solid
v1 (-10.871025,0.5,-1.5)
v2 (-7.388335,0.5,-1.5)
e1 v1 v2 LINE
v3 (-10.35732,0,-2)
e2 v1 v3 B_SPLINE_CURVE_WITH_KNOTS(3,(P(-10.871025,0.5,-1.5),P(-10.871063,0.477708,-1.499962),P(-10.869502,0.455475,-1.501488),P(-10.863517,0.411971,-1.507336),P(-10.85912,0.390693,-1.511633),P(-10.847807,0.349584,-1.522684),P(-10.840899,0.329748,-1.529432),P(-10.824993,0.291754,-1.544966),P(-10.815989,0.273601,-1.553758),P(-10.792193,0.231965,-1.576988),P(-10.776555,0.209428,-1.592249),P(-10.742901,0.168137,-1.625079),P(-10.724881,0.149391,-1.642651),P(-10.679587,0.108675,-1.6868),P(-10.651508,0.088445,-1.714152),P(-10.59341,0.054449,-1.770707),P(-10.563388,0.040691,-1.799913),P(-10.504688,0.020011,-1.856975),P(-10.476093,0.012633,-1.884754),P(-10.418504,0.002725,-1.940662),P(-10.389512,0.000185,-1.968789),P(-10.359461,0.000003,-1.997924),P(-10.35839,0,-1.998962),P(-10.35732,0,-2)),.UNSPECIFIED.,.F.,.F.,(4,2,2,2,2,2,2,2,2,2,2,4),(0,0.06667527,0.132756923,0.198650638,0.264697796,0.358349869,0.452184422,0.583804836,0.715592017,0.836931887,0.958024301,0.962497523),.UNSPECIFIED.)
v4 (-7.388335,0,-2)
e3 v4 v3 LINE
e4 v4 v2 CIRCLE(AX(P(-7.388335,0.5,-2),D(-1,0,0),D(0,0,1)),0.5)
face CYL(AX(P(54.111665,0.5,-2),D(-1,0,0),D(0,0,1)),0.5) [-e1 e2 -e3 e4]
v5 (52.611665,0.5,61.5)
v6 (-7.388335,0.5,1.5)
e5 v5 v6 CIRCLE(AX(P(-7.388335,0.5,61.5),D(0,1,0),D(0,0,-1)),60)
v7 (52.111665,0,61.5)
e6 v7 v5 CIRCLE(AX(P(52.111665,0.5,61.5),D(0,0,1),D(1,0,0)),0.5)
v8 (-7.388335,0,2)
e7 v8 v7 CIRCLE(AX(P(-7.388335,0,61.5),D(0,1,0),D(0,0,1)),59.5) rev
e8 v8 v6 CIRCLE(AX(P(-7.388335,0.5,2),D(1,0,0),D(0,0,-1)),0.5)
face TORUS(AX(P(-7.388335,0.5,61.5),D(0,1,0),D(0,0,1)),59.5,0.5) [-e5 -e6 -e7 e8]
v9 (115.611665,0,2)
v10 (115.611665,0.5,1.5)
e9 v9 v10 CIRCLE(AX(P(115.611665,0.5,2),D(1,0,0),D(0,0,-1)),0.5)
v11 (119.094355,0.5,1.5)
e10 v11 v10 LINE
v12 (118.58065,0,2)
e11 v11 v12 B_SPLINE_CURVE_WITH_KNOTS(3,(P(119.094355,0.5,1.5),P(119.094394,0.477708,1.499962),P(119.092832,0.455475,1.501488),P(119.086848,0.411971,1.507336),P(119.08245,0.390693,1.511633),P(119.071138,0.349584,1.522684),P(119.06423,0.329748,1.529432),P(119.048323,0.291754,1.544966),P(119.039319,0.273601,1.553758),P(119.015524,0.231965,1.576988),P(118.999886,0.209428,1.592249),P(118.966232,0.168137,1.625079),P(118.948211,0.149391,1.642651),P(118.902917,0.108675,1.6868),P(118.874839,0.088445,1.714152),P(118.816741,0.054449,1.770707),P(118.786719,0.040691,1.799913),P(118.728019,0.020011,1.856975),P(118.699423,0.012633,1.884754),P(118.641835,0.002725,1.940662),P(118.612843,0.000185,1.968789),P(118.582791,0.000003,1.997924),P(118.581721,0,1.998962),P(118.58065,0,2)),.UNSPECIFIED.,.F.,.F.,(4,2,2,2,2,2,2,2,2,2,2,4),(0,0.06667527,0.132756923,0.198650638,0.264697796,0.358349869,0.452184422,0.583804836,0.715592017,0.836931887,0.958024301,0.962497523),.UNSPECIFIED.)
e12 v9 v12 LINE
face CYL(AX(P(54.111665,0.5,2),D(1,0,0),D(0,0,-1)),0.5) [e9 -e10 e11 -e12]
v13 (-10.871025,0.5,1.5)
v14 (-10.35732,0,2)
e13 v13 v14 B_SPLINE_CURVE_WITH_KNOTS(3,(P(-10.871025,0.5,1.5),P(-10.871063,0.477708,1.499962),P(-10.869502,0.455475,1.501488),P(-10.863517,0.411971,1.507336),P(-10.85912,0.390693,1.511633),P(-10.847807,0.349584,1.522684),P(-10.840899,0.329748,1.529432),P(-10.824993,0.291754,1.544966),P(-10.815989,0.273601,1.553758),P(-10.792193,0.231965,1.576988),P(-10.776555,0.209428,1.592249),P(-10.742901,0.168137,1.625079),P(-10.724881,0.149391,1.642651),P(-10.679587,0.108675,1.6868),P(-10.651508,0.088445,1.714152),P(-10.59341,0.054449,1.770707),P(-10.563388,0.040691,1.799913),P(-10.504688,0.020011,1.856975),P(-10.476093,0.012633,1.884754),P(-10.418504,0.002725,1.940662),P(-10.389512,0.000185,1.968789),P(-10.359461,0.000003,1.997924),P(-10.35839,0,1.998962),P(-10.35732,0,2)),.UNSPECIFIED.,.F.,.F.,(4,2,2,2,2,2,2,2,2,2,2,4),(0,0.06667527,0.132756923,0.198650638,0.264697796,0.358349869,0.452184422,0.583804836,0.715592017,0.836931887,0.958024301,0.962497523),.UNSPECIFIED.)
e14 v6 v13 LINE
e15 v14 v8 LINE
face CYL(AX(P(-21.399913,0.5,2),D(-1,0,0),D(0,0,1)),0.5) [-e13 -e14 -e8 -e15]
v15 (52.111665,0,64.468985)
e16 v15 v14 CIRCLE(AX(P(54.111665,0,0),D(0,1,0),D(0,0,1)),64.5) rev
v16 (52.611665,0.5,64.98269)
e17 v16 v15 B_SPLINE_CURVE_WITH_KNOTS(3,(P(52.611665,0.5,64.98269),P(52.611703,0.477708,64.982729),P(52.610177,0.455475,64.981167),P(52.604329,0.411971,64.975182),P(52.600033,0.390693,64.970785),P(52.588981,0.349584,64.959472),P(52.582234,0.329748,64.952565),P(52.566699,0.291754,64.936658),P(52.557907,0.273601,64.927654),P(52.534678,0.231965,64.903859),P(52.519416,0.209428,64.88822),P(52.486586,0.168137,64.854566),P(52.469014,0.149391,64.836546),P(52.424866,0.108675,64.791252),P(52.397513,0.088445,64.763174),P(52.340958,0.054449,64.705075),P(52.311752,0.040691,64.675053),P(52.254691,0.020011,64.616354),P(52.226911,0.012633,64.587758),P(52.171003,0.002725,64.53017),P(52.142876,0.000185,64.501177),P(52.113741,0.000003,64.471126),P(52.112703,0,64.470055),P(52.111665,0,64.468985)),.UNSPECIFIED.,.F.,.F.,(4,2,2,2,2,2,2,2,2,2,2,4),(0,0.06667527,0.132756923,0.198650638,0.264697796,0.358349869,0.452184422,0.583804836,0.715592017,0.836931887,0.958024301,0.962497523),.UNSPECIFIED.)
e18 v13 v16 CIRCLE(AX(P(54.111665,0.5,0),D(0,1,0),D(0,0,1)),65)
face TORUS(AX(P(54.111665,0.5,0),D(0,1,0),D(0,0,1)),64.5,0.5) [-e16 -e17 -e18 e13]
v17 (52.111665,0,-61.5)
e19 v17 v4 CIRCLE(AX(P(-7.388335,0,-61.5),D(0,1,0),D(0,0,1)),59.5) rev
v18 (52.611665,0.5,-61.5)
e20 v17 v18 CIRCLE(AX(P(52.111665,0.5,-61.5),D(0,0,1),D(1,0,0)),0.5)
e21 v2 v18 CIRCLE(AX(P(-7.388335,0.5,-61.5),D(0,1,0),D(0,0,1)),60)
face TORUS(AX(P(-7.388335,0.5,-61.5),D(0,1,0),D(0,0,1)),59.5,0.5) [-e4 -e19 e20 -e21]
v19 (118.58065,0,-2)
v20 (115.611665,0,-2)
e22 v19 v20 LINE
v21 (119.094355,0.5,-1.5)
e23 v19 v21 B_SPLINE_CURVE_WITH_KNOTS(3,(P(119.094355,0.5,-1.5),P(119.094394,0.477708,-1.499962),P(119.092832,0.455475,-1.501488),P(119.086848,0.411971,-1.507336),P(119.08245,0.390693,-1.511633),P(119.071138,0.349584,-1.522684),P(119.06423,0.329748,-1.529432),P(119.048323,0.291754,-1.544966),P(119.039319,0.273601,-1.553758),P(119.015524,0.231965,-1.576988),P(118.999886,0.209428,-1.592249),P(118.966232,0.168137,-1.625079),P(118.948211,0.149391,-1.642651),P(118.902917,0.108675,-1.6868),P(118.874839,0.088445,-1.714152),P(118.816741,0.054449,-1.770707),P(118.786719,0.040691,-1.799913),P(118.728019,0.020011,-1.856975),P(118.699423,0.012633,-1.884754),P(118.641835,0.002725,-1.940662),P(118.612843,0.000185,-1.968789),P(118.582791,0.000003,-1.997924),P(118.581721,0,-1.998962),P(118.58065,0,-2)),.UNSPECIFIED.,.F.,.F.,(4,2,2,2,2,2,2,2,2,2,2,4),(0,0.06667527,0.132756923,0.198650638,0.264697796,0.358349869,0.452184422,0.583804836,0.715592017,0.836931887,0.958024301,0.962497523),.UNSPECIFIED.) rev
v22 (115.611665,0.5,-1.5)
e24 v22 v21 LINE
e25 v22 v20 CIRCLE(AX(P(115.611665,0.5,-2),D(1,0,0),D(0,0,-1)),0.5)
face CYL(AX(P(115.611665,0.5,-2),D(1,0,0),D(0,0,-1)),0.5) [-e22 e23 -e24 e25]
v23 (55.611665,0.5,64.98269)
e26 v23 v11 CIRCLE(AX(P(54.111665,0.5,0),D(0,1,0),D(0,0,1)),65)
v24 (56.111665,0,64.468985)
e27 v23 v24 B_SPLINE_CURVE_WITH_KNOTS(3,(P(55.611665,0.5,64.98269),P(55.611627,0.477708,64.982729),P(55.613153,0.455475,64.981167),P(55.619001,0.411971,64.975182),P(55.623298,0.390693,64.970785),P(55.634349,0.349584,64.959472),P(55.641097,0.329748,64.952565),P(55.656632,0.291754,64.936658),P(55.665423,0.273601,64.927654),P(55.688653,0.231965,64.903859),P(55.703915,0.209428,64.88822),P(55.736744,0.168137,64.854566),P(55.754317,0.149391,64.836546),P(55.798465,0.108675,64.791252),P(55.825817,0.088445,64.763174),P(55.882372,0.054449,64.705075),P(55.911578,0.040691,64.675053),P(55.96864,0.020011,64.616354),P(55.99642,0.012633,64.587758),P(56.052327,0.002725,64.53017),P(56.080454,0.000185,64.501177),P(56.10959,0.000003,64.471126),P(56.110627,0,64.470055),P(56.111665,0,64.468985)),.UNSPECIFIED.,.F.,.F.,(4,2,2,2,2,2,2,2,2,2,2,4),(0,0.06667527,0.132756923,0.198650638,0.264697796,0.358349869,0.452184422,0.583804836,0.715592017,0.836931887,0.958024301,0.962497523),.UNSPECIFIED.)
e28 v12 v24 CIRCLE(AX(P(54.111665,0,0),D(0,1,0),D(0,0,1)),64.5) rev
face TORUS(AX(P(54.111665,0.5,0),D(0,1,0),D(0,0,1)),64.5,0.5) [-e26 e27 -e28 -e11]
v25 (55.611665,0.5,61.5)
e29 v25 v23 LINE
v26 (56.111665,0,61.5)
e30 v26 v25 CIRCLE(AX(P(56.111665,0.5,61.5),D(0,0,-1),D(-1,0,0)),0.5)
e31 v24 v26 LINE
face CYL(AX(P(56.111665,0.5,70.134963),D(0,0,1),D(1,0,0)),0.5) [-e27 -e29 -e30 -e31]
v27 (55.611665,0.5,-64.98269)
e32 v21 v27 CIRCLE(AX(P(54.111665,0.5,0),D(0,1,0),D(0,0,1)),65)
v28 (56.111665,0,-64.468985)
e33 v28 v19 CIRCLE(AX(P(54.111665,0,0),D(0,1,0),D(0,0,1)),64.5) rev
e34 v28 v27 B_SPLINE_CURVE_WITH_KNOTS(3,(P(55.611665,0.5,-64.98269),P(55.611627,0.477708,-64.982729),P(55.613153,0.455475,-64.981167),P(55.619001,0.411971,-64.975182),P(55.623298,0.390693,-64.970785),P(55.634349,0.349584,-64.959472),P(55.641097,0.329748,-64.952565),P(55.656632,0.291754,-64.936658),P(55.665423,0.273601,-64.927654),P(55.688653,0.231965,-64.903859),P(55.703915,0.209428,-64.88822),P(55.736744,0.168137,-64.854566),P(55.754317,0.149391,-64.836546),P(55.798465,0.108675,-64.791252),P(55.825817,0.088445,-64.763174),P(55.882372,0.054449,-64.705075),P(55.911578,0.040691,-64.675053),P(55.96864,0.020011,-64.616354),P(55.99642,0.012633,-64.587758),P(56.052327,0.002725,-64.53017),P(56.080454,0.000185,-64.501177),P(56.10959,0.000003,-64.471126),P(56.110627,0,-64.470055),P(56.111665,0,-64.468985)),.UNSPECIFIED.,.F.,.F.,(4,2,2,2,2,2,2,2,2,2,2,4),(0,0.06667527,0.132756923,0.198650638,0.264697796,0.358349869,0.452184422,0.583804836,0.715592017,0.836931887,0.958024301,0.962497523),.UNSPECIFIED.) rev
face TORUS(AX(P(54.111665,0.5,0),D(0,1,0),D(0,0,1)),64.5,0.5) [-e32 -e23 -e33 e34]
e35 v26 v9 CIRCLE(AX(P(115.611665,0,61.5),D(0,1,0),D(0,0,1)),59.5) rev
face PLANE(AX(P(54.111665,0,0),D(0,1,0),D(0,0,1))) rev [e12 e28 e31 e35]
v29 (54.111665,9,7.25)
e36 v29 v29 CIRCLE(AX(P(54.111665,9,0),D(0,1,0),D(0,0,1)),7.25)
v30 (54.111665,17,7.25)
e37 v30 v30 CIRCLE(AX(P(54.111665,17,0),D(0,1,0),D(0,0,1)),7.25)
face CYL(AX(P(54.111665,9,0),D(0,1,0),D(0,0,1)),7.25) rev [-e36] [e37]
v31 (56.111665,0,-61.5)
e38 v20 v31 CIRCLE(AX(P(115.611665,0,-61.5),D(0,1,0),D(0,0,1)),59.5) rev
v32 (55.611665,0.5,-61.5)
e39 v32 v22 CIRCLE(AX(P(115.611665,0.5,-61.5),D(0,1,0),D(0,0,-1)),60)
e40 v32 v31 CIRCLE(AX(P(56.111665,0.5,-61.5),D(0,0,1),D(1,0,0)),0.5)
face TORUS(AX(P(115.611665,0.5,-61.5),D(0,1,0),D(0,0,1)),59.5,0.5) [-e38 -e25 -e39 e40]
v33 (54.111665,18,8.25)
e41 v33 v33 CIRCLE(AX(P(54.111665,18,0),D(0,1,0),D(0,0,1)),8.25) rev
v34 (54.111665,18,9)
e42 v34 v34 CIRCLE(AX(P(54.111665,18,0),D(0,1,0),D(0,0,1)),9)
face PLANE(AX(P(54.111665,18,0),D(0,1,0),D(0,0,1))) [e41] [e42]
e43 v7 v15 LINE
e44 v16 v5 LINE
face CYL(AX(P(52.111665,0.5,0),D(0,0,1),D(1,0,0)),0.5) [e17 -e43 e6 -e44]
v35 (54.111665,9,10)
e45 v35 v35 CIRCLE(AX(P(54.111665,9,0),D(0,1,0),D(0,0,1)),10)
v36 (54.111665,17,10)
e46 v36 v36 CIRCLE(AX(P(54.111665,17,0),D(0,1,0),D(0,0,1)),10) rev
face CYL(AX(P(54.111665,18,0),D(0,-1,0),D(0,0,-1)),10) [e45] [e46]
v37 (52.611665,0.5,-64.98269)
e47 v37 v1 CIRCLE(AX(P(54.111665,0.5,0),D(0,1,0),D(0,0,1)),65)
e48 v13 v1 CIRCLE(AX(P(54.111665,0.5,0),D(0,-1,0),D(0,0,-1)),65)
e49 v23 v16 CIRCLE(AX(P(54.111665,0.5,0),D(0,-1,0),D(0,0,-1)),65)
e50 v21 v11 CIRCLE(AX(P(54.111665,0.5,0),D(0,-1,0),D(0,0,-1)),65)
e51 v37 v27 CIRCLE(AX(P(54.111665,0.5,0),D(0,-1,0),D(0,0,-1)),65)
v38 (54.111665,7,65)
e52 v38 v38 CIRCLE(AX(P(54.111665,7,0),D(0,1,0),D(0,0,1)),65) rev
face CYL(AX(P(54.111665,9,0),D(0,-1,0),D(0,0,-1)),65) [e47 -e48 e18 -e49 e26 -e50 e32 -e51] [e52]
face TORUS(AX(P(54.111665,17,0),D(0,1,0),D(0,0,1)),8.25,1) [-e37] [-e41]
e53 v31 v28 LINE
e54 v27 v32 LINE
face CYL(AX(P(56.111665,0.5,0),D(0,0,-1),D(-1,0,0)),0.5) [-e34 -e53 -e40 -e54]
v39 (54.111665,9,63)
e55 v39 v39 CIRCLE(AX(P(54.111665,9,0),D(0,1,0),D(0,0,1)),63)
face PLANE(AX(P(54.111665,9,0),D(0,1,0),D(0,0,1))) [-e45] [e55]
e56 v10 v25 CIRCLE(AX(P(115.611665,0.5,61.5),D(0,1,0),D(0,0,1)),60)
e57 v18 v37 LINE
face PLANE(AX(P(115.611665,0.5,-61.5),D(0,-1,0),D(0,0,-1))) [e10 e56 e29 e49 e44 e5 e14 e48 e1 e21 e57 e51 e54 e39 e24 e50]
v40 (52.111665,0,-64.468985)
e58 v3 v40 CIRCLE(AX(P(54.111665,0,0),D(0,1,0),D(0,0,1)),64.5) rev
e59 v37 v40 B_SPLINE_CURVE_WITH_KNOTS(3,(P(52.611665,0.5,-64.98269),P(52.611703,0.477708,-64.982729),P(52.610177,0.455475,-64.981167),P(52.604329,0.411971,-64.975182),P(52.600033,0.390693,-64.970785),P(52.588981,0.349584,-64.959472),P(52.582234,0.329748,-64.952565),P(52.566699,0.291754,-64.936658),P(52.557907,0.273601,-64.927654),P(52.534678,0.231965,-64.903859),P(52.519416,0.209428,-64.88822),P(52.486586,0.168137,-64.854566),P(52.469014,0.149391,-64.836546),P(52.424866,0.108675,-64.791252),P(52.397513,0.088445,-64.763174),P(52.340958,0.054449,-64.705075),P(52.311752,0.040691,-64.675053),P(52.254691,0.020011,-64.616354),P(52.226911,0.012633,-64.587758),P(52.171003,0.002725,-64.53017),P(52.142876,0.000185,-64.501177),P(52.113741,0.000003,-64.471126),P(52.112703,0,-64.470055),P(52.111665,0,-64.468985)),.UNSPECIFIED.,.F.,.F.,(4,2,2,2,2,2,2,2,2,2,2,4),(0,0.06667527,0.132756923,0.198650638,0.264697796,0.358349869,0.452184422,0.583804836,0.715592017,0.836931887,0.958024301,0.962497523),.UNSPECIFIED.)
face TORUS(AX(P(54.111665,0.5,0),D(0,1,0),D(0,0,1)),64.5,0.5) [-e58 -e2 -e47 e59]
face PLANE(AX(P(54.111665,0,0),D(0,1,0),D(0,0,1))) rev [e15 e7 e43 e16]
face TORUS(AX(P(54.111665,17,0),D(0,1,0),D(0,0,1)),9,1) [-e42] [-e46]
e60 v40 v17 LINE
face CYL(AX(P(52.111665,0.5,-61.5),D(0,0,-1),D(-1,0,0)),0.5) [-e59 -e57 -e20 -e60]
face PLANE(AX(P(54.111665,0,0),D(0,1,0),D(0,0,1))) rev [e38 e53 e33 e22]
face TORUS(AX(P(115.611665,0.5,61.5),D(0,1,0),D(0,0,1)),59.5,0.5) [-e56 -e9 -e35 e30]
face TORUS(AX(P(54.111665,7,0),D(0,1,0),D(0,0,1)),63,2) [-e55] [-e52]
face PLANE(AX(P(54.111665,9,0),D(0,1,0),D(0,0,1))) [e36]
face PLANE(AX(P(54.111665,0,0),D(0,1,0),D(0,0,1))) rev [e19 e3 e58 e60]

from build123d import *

# Parameters (mm, degrees)
SKETCH1_R           = 65
BOSS_EXTRUDE1_DEPTH = 9
SKETCH2_R           = 10
BOSS_EXTRUDE2_DEPTH = 9
SKETCH3_R           = 7.25
CUT_EXTRUDE1_DEPTH  = 9
CUT_EXTRUDE2_DEPTH  = 0.5
FILLET1_R           = 0.5
FILLET2_R           = 2
FILLET3_R           = 1


with BuildPart() as part:
    # Sketch1 → Boss-Extrude1 (new body)
    with BuildSketch(Plane(origin=(0, 0, 0), x_dir=(1, 0, 0), z_dir=(0, 1, 0))):
        with Locations(Location((54.111665284, 0, 0), (0, 0, 270))):
            Circle(SKETCH1_R)
    extrude(amount=BOSS_EXTRUDE1_DEPTH)

    # Sketch2 → Boss-Extrude2 (add)
    with BuildSketch(Plane(origin=(0, 9, 0), x_dir=(1, 0, 0), z_dir=(0, 1, 0))):
        with Locations(Location((54.111665284, 0, 0), (0, 0, 270))):
            Circle(SKETCH2_R)
    extrude(amount=BOSS_EXTRUDE2_DEPTH)

    # Sketch3 → Cut-Extrude1 (cut)
    with BuildSketch(Plane(origin=(0, 18, 0), x_dir=(1, 0, 0), z_dir=(0, 1, 0))):
        with Locations(Location((54.111665284, 0, 0), (0, 0, 270))):
            Circle(SKETCH3_R)
    extrude(amount=-CUT_EXTRUDE1_DEPTH, mode=Mode.SUBTRACT)

    # Sketch4 → Cut-Extrude2 (cut)
    with BuildSketch(Plane.XZ):
        with BuildLine():
            Line((-21.399913382, 1.5), (-7.388334716, 1.5))
            ThreePointArc((-7.388334716, 1.5), (35.038072155, 19.073593129), (52.611665284, 61.5))
            Line((52.611665284, 61.5), (52.611665284, 70.134963097))
            Line((52.611665284, 70.134963097), (55.611665284, 70.134963097))
            Line((55.611665284, 70.134963097), (55.611665284, 61.5))
            ThreePointArc((55.611665284, 61.5), (73.185258413, 19.073593129), (115.611665284, 1.5))
            Line((115.611665284, 1.5), (129.62324395, 1.5))
            Line((129.62324395, 1.5), (129.62324395, -1.5))
            Line((129.62324395, -1.5), (115.611665284, -1.5))
            ThreePointArc((115.611665284, -1.5), (73.185258413, -19.073593129), (55.611665284, -61.5))
            Line((55.611665284, -61.5), (55.611665284, -70.134963097))
            Line((55.611665284, -70.134963097), (52.611665284, -70.134963097))
            Line((52.611665284, -70.134963097), (52.611665284, -61.5))
            ThreePointArc((52.611665284, -61.5), (35.038072155, -19.073593129), (-7.388334716, -1.5))
            Line((-7.388334716, -1.5), (-21.399913382, -1.5))
            Line((-21.399913382, -1.5), (-21.399913382, 1.5))
        make_face()
    extrude(amount=-CUT_EXTRUDE2_DEPTH, mode=Mode.SUBTRACT)

    # Fillet1
    fillet1_edges = [part.edges().sort_by_distance(p)[0] for p in [
        (117.353010285, 0, 1.5),
        (55.611665284, 0, 63.241345001),
        (100.073606061, 0, 45.961940777),
        (52.611665284, 0, 63.241345001),
        (-9.129679717, 0, 1.5),
        (8.149724507, 0, 45.961940777),
        (-9.129679717, 0, -1.5),
        (52.611665284, 0, -63.241345001),
        (8.149724507, 0, -45.961940777),
        (55.611665284, 0, -63.241345001),
        (117.353010285, 0, -1.5),
        (100.073606061, 0, -45.961940777),
        (73.185258413, 0, 19.073593129),
        (73.185258413, 0, -19.073593129),
        (35.038072155, 0, -19.073593129),
        (35.038072155, 0, 19.073593129),
    ]]
    fillet(fillet1_edges, radius=FILLET1_R - 0.0001)  # a hair under: the kernel refuses the full size

    # Fillet2
    fillet2_edges = [part.edges().sort_by_distance(p)[0] for p in [
        (54.111665284, 9, -65),
    ]]
    fillet(fillet2_edges, radius=FILLET2_R)

    # Fillet3
    fillet3_edges = [part.edges().sort_by_distance(p)[0] for p in [
        (54.111665284, 18, -7.25),
        (54.111665284, 18, -10),
    ]]
    fillet(fillet3_edges, radius=FILLET3_R)


solid = part.part
